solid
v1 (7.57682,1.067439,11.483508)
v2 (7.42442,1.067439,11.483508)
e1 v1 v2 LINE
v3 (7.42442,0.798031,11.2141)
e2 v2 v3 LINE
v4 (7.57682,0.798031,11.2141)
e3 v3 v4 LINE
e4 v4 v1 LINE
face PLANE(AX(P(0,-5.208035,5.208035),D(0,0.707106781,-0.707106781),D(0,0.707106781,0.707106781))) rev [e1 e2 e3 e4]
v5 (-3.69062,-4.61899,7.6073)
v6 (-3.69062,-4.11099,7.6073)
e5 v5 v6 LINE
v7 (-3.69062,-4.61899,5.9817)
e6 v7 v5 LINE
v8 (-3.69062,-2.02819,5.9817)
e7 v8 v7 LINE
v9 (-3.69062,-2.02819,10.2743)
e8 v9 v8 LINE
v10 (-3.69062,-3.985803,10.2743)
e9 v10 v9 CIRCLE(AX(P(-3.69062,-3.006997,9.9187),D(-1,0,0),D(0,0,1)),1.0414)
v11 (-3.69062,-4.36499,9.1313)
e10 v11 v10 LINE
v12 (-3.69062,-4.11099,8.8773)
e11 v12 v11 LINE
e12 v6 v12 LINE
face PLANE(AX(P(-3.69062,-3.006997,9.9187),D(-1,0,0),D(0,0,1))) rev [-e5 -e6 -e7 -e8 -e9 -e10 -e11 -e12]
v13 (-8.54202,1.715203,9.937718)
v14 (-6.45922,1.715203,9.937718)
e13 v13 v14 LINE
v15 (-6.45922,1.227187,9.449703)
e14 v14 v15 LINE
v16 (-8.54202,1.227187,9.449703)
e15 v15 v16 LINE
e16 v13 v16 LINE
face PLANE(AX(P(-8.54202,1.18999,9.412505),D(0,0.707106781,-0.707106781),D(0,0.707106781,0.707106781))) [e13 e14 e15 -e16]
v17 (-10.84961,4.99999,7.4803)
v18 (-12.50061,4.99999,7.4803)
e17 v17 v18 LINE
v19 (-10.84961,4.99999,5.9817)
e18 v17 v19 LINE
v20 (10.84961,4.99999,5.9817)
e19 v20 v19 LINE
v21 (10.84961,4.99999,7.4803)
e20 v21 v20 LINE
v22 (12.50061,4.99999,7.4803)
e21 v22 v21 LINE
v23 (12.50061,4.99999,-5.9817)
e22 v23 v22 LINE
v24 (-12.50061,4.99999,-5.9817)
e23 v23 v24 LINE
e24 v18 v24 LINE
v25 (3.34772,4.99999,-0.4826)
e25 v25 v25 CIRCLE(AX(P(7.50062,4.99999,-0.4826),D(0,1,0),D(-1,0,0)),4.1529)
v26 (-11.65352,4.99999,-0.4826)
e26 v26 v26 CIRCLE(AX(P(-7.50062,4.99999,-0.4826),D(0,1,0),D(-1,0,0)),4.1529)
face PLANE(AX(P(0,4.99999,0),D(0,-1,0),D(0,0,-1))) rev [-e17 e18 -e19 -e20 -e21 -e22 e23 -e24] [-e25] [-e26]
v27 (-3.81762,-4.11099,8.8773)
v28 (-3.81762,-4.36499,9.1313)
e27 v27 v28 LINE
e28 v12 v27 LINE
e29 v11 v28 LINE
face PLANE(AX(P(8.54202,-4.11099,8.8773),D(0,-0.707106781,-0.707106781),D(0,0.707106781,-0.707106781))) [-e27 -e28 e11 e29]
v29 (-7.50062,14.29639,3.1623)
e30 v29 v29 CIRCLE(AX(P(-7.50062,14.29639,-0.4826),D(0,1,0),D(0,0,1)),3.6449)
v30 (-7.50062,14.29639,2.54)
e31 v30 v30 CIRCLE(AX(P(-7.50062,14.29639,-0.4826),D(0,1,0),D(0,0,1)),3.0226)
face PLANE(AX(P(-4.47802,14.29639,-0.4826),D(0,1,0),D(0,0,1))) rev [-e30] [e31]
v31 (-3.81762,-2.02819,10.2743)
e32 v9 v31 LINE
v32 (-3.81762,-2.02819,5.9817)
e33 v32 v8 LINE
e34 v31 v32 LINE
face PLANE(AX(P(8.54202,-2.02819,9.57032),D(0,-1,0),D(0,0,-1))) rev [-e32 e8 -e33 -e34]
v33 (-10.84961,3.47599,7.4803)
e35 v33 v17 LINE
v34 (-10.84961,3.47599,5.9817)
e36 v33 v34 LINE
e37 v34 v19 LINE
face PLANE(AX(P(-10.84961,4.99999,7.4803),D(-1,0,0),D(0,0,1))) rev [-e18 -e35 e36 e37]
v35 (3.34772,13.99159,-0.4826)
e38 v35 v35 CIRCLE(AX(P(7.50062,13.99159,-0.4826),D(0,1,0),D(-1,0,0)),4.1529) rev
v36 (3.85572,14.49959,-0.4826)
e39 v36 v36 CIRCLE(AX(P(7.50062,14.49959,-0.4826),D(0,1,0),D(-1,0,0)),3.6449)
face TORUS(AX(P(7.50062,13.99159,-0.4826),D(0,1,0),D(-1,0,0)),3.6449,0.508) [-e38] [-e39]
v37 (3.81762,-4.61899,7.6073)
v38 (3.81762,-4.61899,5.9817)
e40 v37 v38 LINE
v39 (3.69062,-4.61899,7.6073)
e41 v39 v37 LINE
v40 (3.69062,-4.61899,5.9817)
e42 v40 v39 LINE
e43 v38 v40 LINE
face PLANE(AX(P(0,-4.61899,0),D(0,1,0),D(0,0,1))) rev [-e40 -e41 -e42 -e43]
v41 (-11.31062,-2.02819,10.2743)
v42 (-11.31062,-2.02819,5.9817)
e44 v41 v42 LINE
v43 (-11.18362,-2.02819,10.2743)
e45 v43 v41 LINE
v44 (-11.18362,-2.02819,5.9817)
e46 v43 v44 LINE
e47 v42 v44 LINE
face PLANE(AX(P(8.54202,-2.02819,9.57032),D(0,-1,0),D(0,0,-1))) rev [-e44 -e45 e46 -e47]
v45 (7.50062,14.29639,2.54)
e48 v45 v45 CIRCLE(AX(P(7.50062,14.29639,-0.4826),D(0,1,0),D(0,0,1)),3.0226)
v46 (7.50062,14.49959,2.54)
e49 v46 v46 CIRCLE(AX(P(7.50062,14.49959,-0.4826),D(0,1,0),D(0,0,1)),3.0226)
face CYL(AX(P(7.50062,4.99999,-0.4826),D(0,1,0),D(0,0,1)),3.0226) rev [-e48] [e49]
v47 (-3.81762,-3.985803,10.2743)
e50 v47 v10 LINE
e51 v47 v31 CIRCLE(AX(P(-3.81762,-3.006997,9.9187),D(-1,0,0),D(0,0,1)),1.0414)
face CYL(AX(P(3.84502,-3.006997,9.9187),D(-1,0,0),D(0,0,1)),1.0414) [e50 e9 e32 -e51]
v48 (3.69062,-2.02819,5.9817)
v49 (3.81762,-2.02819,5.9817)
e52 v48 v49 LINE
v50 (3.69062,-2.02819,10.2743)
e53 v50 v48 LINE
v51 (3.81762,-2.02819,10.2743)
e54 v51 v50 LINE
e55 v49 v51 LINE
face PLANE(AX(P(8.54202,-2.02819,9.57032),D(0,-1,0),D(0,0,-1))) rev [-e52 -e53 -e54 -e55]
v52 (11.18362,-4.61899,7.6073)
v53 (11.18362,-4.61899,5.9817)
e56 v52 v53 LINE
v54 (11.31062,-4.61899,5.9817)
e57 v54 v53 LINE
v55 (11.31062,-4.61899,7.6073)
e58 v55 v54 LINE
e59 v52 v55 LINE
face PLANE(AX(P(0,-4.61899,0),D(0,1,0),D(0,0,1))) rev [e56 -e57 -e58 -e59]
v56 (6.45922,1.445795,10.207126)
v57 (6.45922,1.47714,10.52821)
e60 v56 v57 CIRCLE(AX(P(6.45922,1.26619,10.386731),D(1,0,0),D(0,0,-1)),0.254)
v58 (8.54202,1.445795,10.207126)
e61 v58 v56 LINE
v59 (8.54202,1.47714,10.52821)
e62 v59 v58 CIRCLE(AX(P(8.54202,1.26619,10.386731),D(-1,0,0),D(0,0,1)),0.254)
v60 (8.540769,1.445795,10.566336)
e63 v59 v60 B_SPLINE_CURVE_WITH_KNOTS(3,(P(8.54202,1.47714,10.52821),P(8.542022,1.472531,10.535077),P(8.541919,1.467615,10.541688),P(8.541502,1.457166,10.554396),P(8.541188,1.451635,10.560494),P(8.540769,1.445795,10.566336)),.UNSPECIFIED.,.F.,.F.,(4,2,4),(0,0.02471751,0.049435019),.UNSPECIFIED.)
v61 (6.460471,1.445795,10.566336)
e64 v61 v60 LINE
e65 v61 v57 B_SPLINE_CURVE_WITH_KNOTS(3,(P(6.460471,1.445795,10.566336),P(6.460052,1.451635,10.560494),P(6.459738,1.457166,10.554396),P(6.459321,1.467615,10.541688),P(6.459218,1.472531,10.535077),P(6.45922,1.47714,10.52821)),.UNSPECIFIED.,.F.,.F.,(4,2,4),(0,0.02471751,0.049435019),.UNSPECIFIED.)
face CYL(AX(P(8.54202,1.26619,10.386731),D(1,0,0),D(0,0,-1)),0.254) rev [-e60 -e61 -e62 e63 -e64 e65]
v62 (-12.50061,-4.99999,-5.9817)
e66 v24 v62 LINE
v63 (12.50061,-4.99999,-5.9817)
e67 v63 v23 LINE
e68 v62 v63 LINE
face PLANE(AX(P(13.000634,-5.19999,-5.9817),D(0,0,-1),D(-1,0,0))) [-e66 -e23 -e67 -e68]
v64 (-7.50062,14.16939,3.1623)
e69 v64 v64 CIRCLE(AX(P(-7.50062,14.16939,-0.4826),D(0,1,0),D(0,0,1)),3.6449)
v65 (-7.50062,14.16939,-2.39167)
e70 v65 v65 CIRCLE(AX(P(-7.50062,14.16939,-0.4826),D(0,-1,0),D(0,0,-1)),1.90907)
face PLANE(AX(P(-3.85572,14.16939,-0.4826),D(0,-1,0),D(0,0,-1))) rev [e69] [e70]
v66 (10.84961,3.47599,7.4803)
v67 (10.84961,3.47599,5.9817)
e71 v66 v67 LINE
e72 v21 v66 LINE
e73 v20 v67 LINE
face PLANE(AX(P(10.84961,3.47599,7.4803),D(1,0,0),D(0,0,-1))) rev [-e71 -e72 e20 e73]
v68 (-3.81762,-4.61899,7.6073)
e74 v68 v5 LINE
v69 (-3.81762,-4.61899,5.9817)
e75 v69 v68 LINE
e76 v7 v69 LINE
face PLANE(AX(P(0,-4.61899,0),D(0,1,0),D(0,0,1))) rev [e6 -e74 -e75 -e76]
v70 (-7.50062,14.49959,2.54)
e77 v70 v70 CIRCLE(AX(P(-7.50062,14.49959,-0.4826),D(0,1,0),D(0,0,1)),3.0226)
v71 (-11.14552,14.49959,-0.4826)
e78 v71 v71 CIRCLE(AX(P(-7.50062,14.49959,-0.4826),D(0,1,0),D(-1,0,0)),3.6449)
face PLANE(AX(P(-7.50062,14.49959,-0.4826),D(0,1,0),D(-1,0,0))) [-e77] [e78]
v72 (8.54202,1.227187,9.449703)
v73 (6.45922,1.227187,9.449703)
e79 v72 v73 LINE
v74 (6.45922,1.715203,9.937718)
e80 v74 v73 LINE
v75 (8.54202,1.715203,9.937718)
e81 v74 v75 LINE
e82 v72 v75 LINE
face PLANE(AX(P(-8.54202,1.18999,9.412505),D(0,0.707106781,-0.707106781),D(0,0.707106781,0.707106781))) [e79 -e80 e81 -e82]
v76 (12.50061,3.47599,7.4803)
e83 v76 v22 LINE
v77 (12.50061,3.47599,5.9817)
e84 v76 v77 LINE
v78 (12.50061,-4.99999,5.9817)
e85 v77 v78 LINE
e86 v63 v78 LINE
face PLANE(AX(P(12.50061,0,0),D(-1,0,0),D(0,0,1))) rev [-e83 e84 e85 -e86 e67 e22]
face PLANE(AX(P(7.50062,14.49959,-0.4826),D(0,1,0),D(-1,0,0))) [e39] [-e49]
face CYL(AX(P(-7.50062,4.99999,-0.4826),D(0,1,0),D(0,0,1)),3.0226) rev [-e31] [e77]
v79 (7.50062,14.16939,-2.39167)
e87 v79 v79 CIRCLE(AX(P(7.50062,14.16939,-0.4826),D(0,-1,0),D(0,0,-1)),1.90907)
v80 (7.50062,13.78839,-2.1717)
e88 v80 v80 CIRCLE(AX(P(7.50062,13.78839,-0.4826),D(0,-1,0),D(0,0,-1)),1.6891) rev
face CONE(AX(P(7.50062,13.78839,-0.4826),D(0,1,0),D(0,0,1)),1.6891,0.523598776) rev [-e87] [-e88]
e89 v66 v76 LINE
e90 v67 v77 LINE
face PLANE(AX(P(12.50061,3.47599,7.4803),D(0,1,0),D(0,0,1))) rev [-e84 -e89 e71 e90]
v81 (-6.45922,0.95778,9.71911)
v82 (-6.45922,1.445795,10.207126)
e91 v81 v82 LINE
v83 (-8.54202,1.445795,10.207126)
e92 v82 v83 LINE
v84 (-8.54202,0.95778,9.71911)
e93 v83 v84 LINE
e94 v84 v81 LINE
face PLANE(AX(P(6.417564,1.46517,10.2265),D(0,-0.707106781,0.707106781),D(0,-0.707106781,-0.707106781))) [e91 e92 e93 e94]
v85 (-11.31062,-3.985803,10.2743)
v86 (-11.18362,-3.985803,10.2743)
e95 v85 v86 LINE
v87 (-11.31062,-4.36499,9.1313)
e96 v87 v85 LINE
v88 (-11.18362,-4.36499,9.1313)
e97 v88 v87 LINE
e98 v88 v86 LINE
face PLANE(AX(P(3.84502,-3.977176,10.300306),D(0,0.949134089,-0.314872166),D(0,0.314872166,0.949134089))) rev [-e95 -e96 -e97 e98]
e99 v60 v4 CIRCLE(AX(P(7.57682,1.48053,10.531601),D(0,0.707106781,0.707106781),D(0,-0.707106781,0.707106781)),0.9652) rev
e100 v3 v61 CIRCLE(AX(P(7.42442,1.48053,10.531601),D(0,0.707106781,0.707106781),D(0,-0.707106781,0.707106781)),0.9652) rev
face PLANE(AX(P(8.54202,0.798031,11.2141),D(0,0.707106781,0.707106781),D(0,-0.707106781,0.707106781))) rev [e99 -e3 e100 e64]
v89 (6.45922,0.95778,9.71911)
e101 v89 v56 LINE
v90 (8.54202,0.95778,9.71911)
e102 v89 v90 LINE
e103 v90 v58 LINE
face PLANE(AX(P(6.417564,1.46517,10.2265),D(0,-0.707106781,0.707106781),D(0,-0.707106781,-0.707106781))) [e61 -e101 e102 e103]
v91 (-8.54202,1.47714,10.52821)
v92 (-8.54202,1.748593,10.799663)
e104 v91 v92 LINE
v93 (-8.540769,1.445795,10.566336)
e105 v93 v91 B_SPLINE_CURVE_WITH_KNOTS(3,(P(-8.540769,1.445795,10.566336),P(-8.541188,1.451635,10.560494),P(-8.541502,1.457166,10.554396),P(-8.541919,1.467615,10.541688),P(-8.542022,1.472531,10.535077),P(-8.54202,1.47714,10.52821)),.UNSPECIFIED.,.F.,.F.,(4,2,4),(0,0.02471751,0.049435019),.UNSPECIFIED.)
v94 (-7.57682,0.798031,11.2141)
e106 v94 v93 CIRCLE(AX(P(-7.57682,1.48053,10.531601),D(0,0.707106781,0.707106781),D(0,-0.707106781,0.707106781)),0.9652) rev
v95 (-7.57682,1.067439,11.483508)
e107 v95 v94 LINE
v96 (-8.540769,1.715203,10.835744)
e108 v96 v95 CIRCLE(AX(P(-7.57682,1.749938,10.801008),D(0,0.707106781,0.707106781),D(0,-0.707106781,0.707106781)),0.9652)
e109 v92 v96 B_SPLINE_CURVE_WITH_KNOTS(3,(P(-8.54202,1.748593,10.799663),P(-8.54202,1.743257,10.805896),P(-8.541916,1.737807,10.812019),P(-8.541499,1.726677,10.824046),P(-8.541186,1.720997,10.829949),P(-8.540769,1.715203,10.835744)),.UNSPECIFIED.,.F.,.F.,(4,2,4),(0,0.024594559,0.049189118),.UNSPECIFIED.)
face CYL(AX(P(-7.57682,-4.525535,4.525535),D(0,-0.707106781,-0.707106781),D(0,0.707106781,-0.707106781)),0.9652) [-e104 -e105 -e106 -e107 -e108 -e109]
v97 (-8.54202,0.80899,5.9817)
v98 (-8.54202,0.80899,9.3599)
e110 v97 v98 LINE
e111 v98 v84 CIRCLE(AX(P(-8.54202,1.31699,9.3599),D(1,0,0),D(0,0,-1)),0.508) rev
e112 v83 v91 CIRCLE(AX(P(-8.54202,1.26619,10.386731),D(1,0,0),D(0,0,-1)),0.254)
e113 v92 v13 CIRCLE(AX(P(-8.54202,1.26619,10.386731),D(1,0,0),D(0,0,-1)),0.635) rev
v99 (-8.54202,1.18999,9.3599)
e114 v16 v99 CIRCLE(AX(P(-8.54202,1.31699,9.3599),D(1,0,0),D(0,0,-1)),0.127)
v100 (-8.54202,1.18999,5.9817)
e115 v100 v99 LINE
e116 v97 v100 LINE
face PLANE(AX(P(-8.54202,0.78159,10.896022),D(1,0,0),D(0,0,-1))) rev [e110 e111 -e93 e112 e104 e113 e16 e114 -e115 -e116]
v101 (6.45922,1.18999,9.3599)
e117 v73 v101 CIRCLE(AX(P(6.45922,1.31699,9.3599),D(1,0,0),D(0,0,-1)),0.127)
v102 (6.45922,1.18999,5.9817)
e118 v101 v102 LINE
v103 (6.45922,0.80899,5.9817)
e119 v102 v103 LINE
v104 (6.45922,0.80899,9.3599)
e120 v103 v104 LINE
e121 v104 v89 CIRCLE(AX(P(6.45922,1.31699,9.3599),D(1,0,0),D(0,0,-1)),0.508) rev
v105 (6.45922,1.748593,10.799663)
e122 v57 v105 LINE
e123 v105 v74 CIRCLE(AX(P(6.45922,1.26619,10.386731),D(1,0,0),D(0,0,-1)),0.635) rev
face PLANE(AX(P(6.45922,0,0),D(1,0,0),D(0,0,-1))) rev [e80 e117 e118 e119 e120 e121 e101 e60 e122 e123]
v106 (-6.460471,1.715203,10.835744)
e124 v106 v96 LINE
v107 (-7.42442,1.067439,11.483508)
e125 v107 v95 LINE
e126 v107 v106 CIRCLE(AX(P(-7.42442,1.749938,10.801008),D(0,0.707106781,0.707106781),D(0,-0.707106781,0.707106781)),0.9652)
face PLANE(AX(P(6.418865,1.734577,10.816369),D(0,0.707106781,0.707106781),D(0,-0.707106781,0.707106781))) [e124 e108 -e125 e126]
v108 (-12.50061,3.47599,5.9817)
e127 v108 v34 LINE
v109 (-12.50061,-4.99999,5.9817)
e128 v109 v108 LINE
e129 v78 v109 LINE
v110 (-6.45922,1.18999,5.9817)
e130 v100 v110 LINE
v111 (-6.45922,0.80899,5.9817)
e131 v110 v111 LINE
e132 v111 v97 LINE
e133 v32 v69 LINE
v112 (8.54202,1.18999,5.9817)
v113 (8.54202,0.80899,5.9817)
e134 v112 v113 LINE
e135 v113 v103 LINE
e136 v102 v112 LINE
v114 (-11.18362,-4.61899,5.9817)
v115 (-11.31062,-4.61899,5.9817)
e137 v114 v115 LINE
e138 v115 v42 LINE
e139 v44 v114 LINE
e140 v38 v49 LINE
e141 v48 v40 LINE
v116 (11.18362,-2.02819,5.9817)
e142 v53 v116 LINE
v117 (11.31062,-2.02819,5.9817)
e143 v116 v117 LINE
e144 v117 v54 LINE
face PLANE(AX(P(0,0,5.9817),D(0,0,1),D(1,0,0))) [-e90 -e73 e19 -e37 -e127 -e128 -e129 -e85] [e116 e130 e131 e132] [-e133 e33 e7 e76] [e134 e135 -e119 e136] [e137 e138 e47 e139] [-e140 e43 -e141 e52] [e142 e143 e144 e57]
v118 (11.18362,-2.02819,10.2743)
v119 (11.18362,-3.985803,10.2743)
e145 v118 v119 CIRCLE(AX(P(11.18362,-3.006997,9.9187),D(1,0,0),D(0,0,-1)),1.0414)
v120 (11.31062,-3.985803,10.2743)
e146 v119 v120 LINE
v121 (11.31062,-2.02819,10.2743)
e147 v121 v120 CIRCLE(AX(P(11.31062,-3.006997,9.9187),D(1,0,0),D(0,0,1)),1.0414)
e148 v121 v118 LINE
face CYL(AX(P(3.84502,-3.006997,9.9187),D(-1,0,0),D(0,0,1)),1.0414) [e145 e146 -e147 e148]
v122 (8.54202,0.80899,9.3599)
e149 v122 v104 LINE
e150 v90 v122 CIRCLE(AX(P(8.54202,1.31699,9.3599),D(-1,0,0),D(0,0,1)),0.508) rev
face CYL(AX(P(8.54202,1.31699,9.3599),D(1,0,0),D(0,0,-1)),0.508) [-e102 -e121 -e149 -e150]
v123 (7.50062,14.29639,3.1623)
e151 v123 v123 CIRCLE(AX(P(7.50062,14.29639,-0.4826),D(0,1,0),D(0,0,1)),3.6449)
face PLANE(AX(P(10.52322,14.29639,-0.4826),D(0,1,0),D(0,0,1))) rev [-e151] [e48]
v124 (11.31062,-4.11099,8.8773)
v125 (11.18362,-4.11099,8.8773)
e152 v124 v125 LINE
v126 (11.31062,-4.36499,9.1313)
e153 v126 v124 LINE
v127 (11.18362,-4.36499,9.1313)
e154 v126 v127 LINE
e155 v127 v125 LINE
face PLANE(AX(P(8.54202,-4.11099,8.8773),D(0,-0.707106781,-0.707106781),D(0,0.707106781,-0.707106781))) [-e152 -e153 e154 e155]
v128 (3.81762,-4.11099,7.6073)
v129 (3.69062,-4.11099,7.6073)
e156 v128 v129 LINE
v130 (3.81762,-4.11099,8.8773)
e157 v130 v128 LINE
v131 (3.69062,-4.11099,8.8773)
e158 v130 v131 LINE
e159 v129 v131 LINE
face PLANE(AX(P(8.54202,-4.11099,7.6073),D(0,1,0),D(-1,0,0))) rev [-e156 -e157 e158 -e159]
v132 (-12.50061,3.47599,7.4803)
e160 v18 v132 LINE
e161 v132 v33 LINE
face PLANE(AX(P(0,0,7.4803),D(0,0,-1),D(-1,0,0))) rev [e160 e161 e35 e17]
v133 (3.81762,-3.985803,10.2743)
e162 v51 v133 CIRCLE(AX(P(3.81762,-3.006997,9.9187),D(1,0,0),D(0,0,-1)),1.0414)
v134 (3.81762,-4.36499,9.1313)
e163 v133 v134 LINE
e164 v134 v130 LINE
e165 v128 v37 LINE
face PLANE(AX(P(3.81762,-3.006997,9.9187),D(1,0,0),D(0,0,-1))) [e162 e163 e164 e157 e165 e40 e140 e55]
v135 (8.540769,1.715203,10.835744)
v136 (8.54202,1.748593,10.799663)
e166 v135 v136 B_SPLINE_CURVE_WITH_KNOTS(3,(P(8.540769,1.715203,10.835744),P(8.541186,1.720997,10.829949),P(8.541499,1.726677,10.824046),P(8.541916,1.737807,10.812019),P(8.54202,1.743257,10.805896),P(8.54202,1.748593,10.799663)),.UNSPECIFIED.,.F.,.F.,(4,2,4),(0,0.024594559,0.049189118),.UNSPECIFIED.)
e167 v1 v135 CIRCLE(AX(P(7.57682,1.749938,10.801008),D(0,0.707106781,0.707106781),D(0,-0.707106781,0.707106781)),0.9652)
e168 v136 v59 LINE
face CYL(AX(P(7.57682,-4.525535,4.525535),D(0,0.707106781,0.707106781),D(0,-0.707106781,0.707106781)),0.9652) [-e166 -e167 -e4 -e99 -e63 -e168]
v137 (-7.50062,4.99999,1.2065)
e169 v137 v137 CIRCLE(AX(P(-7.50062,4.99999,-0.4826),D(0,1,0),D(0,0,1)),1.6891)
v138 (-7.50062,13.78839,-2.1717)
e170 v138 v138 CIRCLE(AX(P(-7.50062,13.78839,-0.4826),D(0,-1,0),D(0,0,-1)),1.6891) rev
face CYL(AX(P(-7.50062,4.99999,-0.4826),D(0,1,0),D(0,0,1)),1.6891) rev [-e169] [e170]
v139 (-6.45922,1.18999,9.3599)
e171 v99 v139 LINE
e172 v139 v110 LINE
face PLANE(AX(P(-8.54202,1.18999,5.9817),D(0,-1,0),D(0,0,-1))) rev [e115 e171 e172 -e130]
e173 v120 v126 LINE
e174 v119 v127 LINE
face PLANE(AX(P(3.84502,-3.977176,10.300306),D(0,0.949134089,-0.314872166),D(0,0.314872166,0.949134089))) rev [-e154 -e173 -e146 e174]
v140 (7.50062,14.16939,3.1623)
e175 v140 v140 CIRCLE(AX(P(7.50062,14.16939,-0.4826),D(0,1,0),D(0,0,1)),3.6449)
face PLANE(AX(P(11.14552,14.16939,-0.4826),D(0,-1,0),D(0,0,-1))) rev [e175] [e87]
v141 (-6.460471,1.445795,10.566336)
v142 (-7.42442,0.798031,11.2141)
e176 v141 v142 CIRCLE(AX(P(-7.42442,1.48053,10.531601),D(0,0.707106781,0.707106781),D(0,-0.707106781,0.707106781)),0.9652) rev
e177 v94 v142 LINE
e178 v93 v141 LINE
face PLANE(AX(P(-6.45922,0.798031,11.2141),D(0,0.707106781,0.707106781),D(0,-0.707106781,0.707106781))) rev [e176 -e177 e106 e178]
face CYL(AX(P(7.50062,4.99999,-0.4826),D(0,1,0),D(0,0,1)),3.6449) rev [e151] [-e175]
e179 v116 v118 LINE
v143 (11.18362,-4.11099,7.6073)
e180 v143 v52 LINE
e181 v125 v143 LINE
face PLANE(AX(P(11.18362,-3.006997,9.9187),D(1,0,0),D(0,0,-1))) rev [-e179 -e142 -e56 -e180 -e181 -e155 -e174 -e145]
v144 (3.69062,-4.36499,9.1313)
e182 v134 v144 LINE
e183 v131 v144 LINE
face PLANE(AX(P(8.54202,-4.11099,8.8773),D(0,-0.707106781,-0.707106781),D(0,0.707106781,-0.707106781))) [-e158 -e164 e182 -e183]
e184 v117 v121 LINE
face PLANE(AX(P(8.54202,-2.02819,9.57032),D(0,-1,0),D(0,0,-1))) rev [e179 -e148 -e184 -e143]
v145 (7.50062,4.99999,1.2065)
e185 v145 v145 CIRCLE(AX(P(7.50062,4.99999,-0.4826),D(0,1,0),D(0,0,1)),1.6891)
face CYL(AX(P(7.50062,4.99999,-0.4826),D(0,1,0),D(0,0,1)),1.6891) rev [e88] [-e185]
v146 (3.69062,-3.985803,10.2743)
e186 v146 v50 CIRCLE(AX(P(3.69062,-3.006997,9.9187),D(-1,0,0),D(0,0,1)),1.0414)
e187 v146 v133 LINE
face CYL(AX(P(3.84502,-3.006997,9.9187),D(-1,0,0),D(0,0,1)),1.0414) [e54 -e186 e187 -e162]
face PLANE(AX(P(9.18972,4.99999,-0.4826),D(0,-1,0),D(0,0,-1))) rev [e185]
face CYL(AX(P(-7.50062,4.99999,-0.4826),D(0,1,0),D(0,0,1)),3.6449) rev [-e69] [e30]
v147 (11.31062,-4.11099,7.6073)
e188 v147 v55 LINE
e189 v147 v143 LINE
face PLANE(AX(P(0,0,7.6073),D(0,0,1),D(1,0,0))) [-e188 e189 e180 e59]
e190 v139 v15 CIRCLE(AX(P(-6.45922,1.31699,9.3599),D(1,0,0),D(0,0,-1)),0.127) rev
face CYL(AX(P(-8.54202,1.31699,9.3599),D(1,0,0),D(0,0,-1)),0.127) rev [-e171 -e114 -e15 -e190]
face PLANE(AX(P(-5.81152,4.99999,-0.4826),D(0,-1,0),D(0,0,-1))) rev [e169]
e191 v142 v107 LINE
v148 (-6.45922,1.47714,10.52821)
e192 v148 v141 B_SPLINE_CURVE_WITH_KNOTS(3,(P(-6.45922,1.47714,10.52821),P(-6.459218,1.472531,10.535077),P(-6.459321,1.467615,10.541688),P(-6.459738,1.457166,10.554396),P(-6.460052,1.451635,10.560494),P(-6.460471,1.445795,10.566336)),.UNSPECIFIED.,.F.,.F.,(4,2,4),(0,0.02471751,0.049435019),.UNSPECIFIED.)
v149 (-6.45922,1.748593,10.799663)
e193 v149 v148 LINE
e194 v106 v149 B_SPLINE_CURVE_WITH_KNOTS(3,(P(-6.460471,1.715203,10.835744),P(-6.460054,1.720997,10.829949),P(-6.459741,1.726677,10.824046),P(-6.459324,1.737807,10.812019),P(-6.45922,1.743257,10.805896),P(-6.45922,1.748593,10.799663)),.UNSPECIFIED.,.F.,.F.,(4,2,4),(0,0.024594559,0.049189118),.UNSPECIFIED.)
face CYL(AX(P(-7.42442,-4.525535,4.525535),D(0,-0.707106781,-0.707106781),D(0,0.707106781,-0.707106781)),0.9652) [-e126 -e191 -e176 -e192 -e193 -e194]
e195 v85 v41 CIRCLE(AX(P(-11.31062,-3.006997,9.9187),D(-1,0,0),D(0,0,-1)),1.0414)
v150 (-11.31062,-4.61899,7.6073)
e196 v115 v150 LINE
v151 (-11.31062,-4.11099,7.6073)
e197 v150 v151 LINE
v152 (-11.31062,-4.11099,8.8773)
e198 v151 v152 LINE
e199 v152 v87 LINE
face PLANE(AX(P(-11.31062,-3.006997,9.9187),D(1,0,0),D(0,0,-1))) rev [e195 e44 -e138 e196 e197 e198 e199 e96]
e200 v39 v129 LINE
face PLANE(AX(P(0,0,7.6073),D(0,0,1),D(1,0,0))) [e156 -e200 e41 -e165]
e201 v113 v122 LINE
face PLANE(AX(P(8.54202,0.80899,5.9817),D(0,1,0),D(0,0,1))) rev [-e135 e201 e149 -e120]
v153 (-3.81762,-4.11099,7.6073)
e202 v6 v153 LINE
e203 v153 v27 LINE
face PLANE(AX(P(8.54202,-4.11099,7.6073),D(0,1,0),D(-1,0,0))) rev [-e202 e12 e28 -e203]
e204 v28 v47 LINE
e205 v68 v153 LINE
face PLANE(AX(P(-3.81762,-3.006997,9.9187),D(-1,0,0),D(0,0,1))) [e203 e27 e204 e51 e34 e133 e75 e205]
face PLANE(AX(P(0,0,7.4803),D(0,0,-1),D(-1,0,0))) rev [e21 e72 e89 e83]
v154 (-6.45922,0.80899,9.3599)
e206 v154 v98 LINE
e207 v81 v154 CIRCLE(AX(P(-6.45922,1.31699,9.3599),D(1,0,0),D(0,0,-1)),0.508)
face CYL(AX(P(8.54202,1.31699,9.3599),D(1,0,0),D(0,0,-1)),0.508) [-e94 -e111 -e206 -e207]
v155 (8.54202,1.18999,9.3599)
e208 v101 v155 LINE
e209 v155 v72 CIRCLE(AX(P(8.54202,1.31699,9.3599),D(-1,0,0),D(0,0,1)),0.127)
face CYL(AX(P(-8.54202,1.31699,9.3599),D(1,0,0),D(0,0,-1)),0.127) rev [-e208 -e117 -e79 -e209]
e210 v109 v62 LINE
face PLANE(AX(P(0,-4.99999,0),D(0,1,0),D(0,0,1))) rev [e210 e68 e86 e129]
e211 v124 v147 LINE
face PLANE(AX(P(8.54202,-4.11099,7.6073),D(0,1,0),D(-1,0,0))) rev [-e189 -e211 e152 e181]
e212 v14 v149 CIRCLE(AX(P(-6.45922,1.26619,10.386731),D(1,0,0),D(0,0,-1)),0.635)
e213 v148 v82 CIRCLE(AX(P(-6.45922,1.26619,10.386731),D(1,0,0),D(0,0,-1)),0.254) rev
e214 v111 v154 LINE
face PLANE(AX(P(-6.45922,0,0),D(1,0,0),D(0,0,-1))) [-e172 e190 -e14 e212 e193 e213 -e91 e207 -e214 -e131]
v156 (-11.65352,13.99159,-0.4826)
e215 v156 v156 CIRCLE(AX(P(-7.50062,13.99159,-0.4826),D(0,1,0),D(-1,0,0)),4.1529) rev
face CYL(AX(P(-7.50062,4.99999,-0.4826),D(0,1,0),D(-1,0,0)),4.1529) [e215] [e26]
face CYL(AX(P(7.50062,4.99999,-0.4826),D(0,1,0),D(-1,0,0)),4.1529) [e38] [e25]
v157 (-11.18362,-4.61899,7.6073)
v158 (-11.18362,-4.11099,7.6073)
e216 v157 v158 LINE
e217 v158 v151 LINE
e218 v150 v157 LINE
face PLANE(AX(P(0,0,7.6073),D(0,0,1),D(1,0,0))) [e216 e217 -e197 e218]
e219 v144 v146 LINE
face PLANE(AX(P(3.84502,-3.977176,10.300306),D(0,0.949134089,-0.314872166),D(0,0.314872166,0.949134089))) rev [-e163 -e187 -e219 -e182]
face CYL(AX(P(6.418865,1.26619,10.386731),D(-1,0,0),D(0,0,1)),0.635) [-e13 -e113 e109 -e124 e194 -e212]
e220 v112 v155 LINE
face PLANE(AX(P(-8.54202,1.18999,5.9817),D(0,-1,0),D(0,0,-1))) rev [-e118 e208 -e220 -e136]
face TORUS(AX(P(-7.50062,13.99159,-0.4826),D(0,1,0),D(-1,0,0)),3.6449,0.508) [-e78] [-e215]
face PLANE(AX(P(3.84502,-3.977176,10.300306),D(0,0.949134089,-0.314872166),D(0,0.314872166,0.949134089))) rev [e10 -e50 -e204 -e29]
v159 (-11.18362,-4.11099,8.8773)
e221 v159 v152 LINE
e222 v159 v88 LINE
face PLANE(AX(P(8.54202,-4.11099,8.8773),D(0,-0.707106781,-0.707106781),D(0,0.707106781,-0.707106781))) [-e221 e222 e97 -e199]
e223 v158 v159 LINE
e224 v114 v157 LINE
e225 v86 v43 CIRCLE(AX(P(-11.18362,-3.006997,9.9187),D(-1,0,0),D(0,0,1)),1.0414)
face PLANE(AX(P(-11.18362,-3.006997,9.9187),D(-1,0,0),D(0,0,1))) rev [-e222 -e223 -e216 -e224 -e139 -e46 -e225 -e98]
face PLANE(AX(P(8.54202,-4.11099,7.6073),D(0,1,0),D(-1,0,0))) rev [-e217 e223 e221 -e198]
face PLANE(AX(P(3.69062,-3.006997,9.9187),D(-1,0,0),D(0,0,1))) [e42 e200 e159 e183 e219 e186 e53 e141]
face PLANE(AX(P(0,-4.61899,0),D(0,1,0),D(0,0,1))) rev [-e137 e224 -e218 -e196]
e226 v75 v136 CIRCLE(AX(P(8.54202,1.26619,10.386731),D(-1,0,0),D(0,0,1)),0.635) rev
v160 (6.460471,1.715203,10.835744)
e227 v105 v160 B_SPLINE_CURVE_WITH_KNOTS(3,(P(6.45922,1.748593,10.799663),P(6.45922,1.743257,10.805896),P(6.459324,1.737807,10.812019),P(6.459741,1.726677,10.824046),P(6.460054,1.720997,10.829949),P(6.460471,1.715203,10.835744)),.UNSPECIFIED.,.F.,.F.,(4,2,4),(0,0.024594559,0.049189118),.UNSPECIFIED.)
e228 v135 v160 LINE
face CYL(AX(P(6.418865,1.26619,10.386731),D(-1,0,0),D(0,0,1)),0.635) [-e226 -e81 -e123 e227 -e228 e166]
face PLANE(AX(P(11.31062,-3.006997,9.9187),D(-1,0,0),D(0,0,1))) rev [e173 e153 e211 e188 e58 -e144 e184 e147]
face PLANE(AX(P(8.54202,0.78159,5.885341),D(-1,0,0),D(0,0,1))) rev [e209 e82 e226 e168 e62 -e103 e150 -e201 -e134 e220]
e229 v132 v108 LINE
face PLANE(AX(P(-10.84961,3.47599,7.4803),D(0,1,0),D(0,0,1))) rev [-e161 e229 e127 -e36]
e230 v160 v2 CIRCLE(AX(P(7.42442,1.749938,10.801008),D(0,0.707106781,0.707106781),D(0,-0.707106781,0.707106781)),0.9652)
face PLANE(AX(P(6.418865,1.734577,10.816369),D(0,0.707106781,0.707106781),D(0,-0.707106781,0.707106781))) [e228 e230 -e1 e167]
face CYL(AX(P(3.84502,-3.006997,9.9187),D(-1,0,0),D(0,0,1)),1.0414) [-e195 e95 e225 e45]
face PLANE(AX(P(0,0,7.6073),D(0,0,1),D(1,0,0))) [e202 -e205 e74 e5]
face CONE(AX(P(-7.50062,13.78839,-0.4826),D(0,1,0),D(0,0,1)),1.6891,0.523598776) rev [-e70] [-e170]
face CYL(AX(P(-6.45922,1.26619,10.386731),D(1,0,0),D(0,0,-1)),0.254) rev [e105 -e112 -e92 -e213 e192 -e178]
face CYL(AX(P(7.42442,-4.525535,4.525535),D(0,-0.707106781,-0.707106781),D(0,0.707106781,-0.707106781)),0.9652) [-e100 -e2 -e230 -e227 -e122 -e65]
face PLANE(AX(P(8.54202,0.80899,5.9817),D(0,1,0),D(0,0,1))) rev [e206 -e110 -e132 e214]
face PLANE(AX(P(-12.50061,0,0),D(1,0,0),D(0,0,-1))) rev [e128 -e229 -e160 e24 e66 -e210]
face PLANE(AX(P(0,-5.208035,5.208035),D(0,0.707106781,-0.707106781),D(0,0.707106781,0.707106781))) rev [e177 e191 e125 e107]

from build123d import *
from OCP.BRepFilletAPI import BRepFilletAPI_MakeChamfer

# Parameters (mm, degrees)
BOSS_EXTRUDE1_START  = -8.54202
BOSS_EXTRUDE1_DEPTH  = 17.08404
SKETCH2_W            = 17.08404
SKETCH2_H            = 15.394205122
BOSS_EXTRUDE2_DEPTH  = 1.861548776
CUT_EXTRUDE1_DEPTH   = 21.904260683
SKETCH4_W            = 17.08404
SKETCH4_H            = 3.81
CUT_EXTRUDE2_DEPTH   = 3.430805122
SKETCH5_W            = 17.08404
SKETCH5_H            = 2.83718
CUT_EXTRUDE3_DEPTH   = 3.58862049
SKETCH6_W            = 17.08404
SKETCH6_H            = 0.508
CUT_EXTRUDE4_DEPTH   = 1.27
CUT_EXTRUDE5_DEPTH   = 12.91844
BOSS_EXTRUDE3_DEPTH  = 2.7686
BOSS_EXTRUDE4_START  = 2.7686
BOSS_EXTRUDE4_DEPTH  = 2.7686
CUT_EXTRUDE6_DEPTH   = 7.366
CUT_EXTRUDE7_START   = -7.366
CUT_EXTRUDE7_DEPTH   = 7.366
CUT_EXTRUDE8_DEPTH   = 7.38124
SKETCH13_W           = 11.9634
SKETCH13_H           = 9.61898
BOSS_EXTRUDE5_DEPTH  = 1.18999
SKETCH14_W           = 11.9634
SKETCH14_H           = 9.61898
BOSS_EXTRUDE6_DEPTH  = 1.18999
SKETCH15_W           = 25.00122
SKETCH15_H           = 11.9634
BOSS_EXTRUDE7_DEPTH  = 0.381
SKETCH16_W           = 2.0828
SKETCH16_H           = 0.381
BOSS_EXTRUDE8_DEPTH  = 1.170076836
SKETCH17_W           = 2.0828
SKETCH17_H           = 0.381
BOSS_EXTRUDE9_DEPTH  = 1.170076836
SKETCH18_W           = 1.651
SKETCH18_H           = 1.524
BOSS_EXTRUDE10_DEPTH = 1.4986
SKETCH19_W           = 1.651
SKETCH19_H           = 1.524
BOSS_EXTRUDE11_DEPTH = 1.4986
DRAFT1_ANGLE         = 45
DRAFT2_ANGLE         = 45
DRAFT3_START         = 2
DRAFT3_OUTLINE_W     = 0.127
DRAFT3_OUTLINE_H     = 0.359210245
DRAFT3_DEPTH         = 1.370290122
DRAFT4_ANGLE         = 45
DRAFT5_ANGLE         = 45
DRAFT6_START         = 2
DRAFT6_OUTLINE_W     = 0.127
DRAFT6_OUTLINE_H     = 0.359210245
DRAFT6_DEPTH         = 1.370290122
SKETCH20_W           = 4.1529
SKETCH20_H           = 9.4996
SKETCH21_W           = 4.1529
SKETCH21_H           = 9.4996
CHAMFER1_SIZE        = 0.219970453
CHAMFER1_SIZE2       = 0.381
FILLET1_R            = 0.127
FILLET2_R            = 0.254
FILLET3_R            = 0.508
FILLET4_R            = 0.635
FILLET5_R            = 0.9652


with BuildPart() as part:
    # Boss-Extrude1: read off the stored shape, not the designer's step
    # Boss-Extrude1 outline → Boss-Extrude1 (new body)
    with BuildSketch(Plane.YZ.offset(BOSS_EXTRUDE1_START)):
        with BuildLine():
            Line((-4.61899, 8.8773), (-4.61899, -5.9817))
            Line((-4.61899, -5.9817), (3.138441224, -5.9817))
            Line((3.138441224, -5.9817), (3.138441224, 9.412505122))
            Line((3.138441224, 9.412505122), (1.894807928, 10.656138418))
            Line((1.894807928, 10.656138418), (0.80899, 9.57032049))
            Line((0.80899, 9.57032049), (-2.025596867, 9.57032049))
            ThreePointArc((-2.025596867, 9.57032049), (-2.65500458, 10.898809938), (-3.985803445, 10.2743))
            Line((-3.985803445, 10.2743), (-4.449253679, 8.8773))
            Line((-4.449253679, 8.8773), (-4.61899, 8.8773))
        make_face()
    extrude(amount=BOSS_EXTRUDE1_DEPTH)

    # Sketch2 → Boss-Extrude2 (add)
    with BuildSketch(Plane(origin=(0, 3.138441224, 0), x_dir=(-1, 0, 0), z_dir=(0, 1, 0))):
        with Locations((0, 1.715402561)):
            Rectangle(SKETCH2_W, SKETCH2_H)
    extrude(amount=BOSS_EXTRUDE2_DEPTH)

    # Sketch3 → Cut-Extrude1 (cut, through all)
    with BuildSketch(Plane.ZY.offset(8.54202)):
        with BuildLine():
            Line((9.57032049, -2.025596867), (9.57032049, -2.02819))
            Line((9.57032049, -2.02819), (10.2743, -2.02819))
            ThreePointArc((10.2743, -2.02819), (9.922536007, -1.965603788), (9.57032049, -2.025596867))
        make_face()
    extrude(amount=-CUT_EXTRUDE1_DEPTH, mode=Mode.SUBTRACT)

    # Sketch4 → Cut-Extrude2 (cut)
    with BuildSketch(Plane.XY.offset(9.412505122)):
        with Locations((0, 3.09499)):
            Rectangle(SKETCH4_W, SKETCH4_H)
    extrude(amount=-CUT_EXTRUDE2_DEPTH, mode=Mode.SUBTRACT)

    # Sketch5 → Cut-Extrude3 (cut)
    with BuildSketch(Plane.XY.offset(9.57032049)):
        with Locations((0, -0.6096)):
            Rectangle(SKETCH5_W, SKETCH5_H)
    extrude(amount=-CUT_EXTRUDE3_DEPTH, mode=Mode.SUBTRACT)

    # Sketch6 → Cut-Extrude4 (cut)
    with BuildSketch(Plane.XY.offset(8.8773)):
        with Locations((0, -4.36499)):
            Rectangle(SKETCH6_W, SKETCH6_H)
    extrude(amount=-CUT_EXTRUDE4_DEPTH, mode=Mode.SUBTRACT)

    # Sketch7 → Cut-Extrude5 (cut)
    with BuildSketch(Plane(origin=(-6.45922, 0, 0), x_dir=(0, -1, 0), z_dir=(-1, 0, 0))):
        Polygon((-0.80899, 9.57032049), (-1.894807928, 10.656138418), (-3.138441224, 9.412505122), (-1.18999, 9.412505122), (-1.18999, 5.9817), (-0.80899, 5.9817), align=None)
    extrude(amount=-CUT_EXTRUDE5_DEPTH, mode=Mode.SUBTRACT)

    # Sketch8 → Boss-Extrude3 (add)
    with BuildSketch(Plane(origin=(8.54202, 0, 0), x_dir=(0, 0, -1), z_dir=(1, 0, 0))):
        with BuildLine():
            Line((-7.6073, -4.11099), (-8.8773, -4.11099))
            Line((-8.8773, -4.11099), (-8.8773, -4.449253679))
            Line((-8.8773, -4.449253679), (-10.2743, -3.985803445))
            ThreePointArc((-10.2743, -3.985803445), (-10.9601, -3.006996722), (-10.2743, -2.02819))
            Line((-10.2743, -2.02819), (-5.9817, -2.02819))
            Line((-5.9817, -2.02819), (-5.9817, 4.99999))
            Line((-5.9817, 4.99999), (5.9817, 4.99999))
            Line((5.9817, 4.99999), (5.9817, -4.61899))
            Line((5.9817, -4.61899), (-7.6073, -4.61899))
            Line((-7.6073, -4.61899), (-7.6073, -4.11099))
        make_face()
    extrude(amount=BOSS_EXTRUDE3_DEPTH)

    # Sketch9 → Boss-Extrude4 (add)
    with BuildSketch(Plane.ZY.offset(8.54202).offset(BOSS_EXTRUDE4_START)):
        with BuildLine():
            Line((10.2743, -3.985803445), (8.8773, -4.449253679))
            Line((8.8773, -4.449253679), (8.8773, -4.11099))
            Line((8.8773, -4.11099), (7.6073, -4.11099))
            Line((7.6073, -4.11099), (7.6073, -4.61899))
            Line((7.6073, -4.61899), (-5.9817, -4.61899))
            Line((-5.9817, -4.61899), (-5.9817, 4.99999))
            Line((-5.9817, 4.99999), (5.9817, 4.99999))
            Line((5.9817, 4.99999), (5.9817, -2.02819))
            Line((5.9817, -2.02819), (10.2743, -2.02819))
            ThreePointArc((10.2743, -2.02819), (10.9601, -3.006996723), (10.2743, -3.985803445))
        make_face()
    extrude(amount=-BOSS_EXTRUDE4_DEPTH)

    # Sketch10 → Cut-Extrude6 (cut)
    with BuildSketch(Plane(origin=(-11.18362, 0, 0), x_dir=(0, -1, 0), z_dir=(-1, 0, 0))):
        with BuildLine():
            Line((4.449253679, 8.8773), (3.985803445, 10.2743))
            ThreePointArc((3.985803445, 10.2743), (3.006996722, 10.9601), (2.02819, 10.2743))
            Line((2.02819, 10.2743), (2.02819, 5.9817))
            Line((2.02819, 5.9817), (4.61899, 5.9817))
            Line((4.61899, 5.9817), (4.61899, 7.6073))
            Line((4.61899, 7.6073), (4.11099, 7.6073))
            Line((4.11099, 7.6073), (4.11099, 8.8773))
            Line((4.11099, 8.8773), (4.449253679, 8.8773))
        make_face()
    extrude(amount=-CUT_EXTRUDE6_DEPTH, mode=Mode.SUBTRACT)

    # Sketch11 → Cut-Extrude7 (cut)
    with BuildSketch(Plane(origin=(11.18362, 0, 0), x_dir=(0, 0, -1), z_dir=(1, 0, 0)).offset(CUT_EXTRUDE7_START)):
        with BuildLine():
            Line((-8.8773, -4.11099), (-7.6073, -4.11099))
            Line((-7.6073, -4.11099), (-7.6073, -4.61899))
            Line((-7.6073, -4.61899), (-5.9817, -4.61899))
            Line((-5.9817, -4.61899), (-5.9817, -2.02819))
            Line((-5.9817, -2.02819), (-10.2743, -2.02819))
            ThreePointArc((-10.2743, -2.02819), (-10.9601, -3.006996723), (-10.2743, -3.985803445))
            Line((-10.2743, -3.985803445), (-8.8773, -4.449253679))
            Line((-8.8773, -4.449253679), (-8.8773, -4.11099))
        make_face()
    extrude(amount=CUT_EXTRUDE7_DEPTH, mode=Mode.SUBTRACT)

    # Sketch12 → Cut-Extrude8 (cut)
    with BuildSketch(Plane(origin=(-3.69062, 0, 0), x_dir=(0, -1, 0), z_dir=(-1, 0, 0))):
        with BuildLine():
            Line((4.449253679, 8.8773), (3.985803445, 10.2743))
            ThreePointArc((3.985803445, 10.2743), (3.006996723, 10.9601), (2.02819, 10.2743))
            Line((2.02819, 10.2743), (2.02819, 5.9817))
            Line((2.02819, 5.9817), (4.61899, 5.9817))
            Line((4.61899, 5.9817), (4.61899, 7.6073))
            Line((4.61899, 7.6073), (4.11099, 7.6073))
            Line((4.11099, 7.6073), (4.11099, 8.8773))
            Line((4.11099, 8.8773), (4.449253679, 8.8773))
        make_face()
    extrude(amount=-CUT_EXTRUDE8_DEPTH, mode=Mode.SUBTRACT)

    # Sketch13 → Boss-Extrude5 (add)
    with BuildSketch(Plane(origin=(11.31062, 0, 0), x_dir=(0, 0, -1), z_dir=(1, 0, 0))):
        with Locations((0, 0.1905)):
            Rectangle(SKETCH13_W, SKETCH13_H)
    extrude(amount=BOSS_EXTRUDE5_DEPTH)

    # Sketch14 → Boss-Extrude6 (add)
    with BuildSketch(Plane.ZY.offset(11.31062)):
        with Locations((0, 0.1905)):
            Rectangle(SKETCH14_W, SKETCH14_H)
    extrude(amount=BOSS_EXTRUDE6_DEPTH)

    # Sketch15 → Boss-Extrude7 (add)
    with BuildSketch(Plane.XZ.offset(4.61899)):
        Rectangle(SKETCH15_W, SKETCH15_H)
    extrude(amount=BOSS_EXTRUDE7_DEPTH)

    # Sketch16 → Boss-Extrude8 (add)
    with BuildSketch(Plane(origin=(0, -4.380665245, 4.380665245), x_dir=(1, 0, 0), z_dir=(0, -0.7071067811870595, 0.7071067811860355))):
        with Locations((-7.50062, 8.684359272)):
            Rectangle(SKETCH16_W, SKETCH16_H)
    extrude(amount=BOSS_EXTRUDE8_DEPTH)

    # Sketch17 → Boss-Extrude9 (add)
    with BuildSketch(Plane(origin=(0, -4.380665245, 4.380665245), x_dir=(1, 0, 0), z_dir=(0, -0.7071067811870595, 0.7071067811860355))):
        with Locations((7.50062, 8.684359272)):
            Rectangle(SKETCH17_W, SKETCH17_H)
    extrude(amount=BOSS_EXTRUDE9_DEPTH)

    # Sketch18 → Boss-Extrude10 (add)
    with BuildSketch(Plane.XY.offset(5.9817)):
        with Locations((11.67511, 4.23799)):
            Rectangle(SKETCH18_W, SKETCH18_H)
    extrude(amount=BOSS_EXTRUDE10_DEPTH)

    # Sketch19 → Boss-Extrude11 (add)
    with BuildSketch(Plane.XY.offset(5.9817)):
        with Locations((-11.67511, 4.23799)):
            Rectangle(SKETCH19_W, SKETCH19_H)
    extrude(amount=BOSS_EXTRUDE11_DEPTH)

    # Draft1
    draft1_faces = [part.faces().sort_by_distance(p)[0] for p in [
        (7.50062, 2.164215612, 9.412505122),
    ]]
    draft(draft1_faces, Plane(origin=(-8.54202, 1.18999, 5.9817), x_dir=(0, 0, 1), z_dir=(0, 1, 0)), DRAFT1_ANGLE)

    # Draft2
    draft2_faces = [part.faces().sort_by_distance(p)[0] for p in [
        (-7.50062, 2.164215612, 9.412505122),
    ]]
    draft(draft2_faces, Plane(origin=(-8.54202, 1.18999, 5.9817), x_dir=(0, 0, 1), z_dir=(0, 1, 0)), DRAFT2_ANGLE)

    # Draft3: read off the stored shape, not the designer's step
    # Draft3 outline → Draft3 (cut)
    with BuildSketch(Plane(origin=(0, 0, 0), x_dir=(1, 0, 0), z_dir=(0, 0.707106781186548, 0.707106781186547)).offset(DRAFT3_START)):
        with Locations((3.75412, -9.363713058)):
            Rectangle(DRAFT3_OUTLINE_W, DRAFT3_OUTLINE_H)
    extrude(amount=DRAFT3_DEPTH, mode=Mode.SUBTRACT)

    # Draft4
    draft4_faces = [part.faces().sort_by_distance(p)[0] for p in [
        (-3.75412, -4.280121839, 8.8773),
    ]]
    draft(draft4_faces, Plane(origin=(8.54202, -4.11099, 7.6073), x_dir=(-1, 0, 0), z_dir=(0, -1, 0)), DRAFT4_ANGLE)

    # Draft5
    draft5_faces = [part.faces().sort_by_distance(p)[0] for p in [
        (-11.24712, -4.280121839, 8.8773),
    ]]
    draft(draft5_faces, Plane(origin=(8.54202, -4.11099, 7.6073), x_dir=(-1, 0, 0), z_dir=(0, -1, 0)), DRAFT5_ANGLE)

    # Draft6: read off the stored shape, not the designer's step
    # Draft6 outline → Draft6 (cut)
    with BuildSketch(Plane(origin=(0, 0, 0), x_dir=(1, 0, 0), z_dir=(0, 0.707106781186548, 0.707106781186547)).offset(DRAFT6_START)):
        with Locations((11.24712, -9.363713058)):
            Rectangle(DRAFT6_OUTLINE_W, DRAFT6_OUTLINE_H)
    extrude(amount=DRAFT6_DEPTH, mode=Mode.SUBTRACT)

    # Sketch20 → Revolve1 (revolve)
    with BuildSketch(Plane(origin=(0, 0, -0.4826), x_dir=(-1, 0, 0), z_dir=(0, 0, -1)), mode=Mode.PRIVATE) as revolve1_sk:
        with Locations((5.42417, 9.74979)):
            Rectangle(SKETCH20_W, SKETCH20_H)
    revolve(revolve1_sk.sketch.rotate(Axis((-7.50062, 4.99999, -0.4826), (0, 1, 0)), 180), axis=Axis((-7.50062, 4.99999, -0.4826), (0, 1, 0)))

    # Sketch21 → Revolve2 (revolve)
    with BuildSketch(Plane(origin=(0, 0, -0.4826), x_dir=(-1, 0, 0), z_dir=(0, 0, -1)), mode=Mode.PRIVATE) as revolve2_sk:
        with Locations((-9.57707, 9.74979)):
            Rectangle(SKETCH21_W, SKETCH21_H)
    revolve(revolve2_sk.sketch.rotate(Axis((7.50062, 4.99999, -0.4826), (0, 1, 0)), 180), axis=Axis((7.50062, 4.99999, -0.4826), (0, 1, 0)))

    # Sketch22 → Cut-Revolve1 (revolve, cut)
    with BuildSketch(Plane(origin=(0, 0, -0.4826), x_dir=(-1, 0, 0), z_dir=(0, 0, -1)), mode=Mode.PRIVATE) as cut_revolve1_sk:
        Polygon((5.81152, 4.99999), (7.50062, 4.99999), (7.50062, 14.49959), (4.47802, 14.49959), (4.47802, 14.29639), (3.85572, 14.29639), (3.85572, 14.16939), (5.81152, 14.16939), align=None)
    revolve(cut_revolve1_sk.sketch.rotate(Axis((-7.50062, 4.99999, -0.4826), (0, 1, 0)), 270), axis=Axis((-7.50062, 4.99999, -0.4826), (0, 1, 0)), mode=Mode.SUBTRACT)

    # Sketch23 → Cut-Revolve2 (revolve, cut)
    with BuildSketch(Plane(origin=(0, 0, -0.4826), x_dir=(-1, 0, 0), z_dir=(0, 0, -1)), mode=Mode.PRIVATE) as cut_revolve2_sk:
        Polygon((-9.18972, 4.99999), (-7.50062, 4.99999), (-7.50062, 14.49959), (-10.52322, 14.49959), (-10.52322, 14.29639), (-11.14552, 14.29639), (-11.14552, 14.16939), (-9.18972, 14.16939), align=None)
    revolve(cut_revolve2_sk.sketch.rotate(Axis((7.50062, 4.99999, -0.4826), (0, 1, 0)), 270), axis=Axis((7.50062, 4.99999, -0.4826), (0, 1, 0)), mode=Mode.SUBTRACT)

    # Chamfer1: one chamfer whose edges measure the first distance from different faces: ONE call of the kernel's chamfer builder (chamfer() names one face for all edges)
    chamfer1_edges_1 = [part.edges().sort_by_distance(p)[0] for p in [
        (-7.50062, 14.16939, -2.1717),
    ]]
    chamfer1_side_1 = [part.faces().sort_by_distance(p)[0] for p in [
        (-7.50062, 14.16939, -4.02440666),
    ]]
    chamfer1_edges_2 = [part.edges().sort_by_distance(p)[0] for p in [
        (7.50062, 14.16939, -2.1717),
    ]]
    chamfer1_side_2 = [part.faces().sort_by_distance(p)[0] for p in [
        (7.50062, 14.16939, -4.02440666),
    ]]
    chamfer1 = BRepFilletAPI_MakeChamfer(part.part.solid().wrapped)
    for e in chamfer1_edges_1:
        chamfer1.Add(CHAMFER1_SIZE, CHAMFER1_SIZE2, e.wrapped, chamfer1_side_1[0].wrapped)  # the first distance lies on this face
    for e in chamfer1_edges_2:
        chamfer1.Add(CHAMFER1_SIZE, CHAMFER1_SIZE2, e.wrapped, chamfer1_side_2[0].wrapped)  # the first distance lies on this face
    add(Compound.cast(chamfer1.Shape()), mode=Mode.REPLACE)

    # Fillet1
    fillet1_edges = [part.edges().sort_by_distance(p)[0] for p in [
        (-7.50062, 1.18999, 9.412505122),
        (7.50062, 1.18999, 9.412505122),
    ]]
    fillet(fillet1_edges, radius=FILLET1_R)

    # Fillet2
    fillet2_edges = [part.edges().sort_by_distance(p)[0] for p in [
        (-7.50062, 1.625400245, 10.386730735),
        (7.50062, 1.625400245, 10.386730735),
    ]]
    fillet(fillet2_edges, radius=FILLET2_R)

    # Fillet3
    fillet3_edges = [part.edges().sort_by_distance(p)[0] for p in [
        (-7.50062, 0.80899, 9.57032049),
        (-3.34772, 14.49959, -0.4826),
        (11.65352, 14.49959, -0.4826),
        (7.50062, 0.80899, 9.57032049),
    ]]
    fillet(fillet3_edges, radius=FILLET3_R)

    # Fillet4
    fillet4_edges = [part.edges().sort_by_distance(p)[0] for p in [
        (-7.50062, 2.164215612, 10.386730734),
        (7.50062, 2.164215612, 10.386730734),
    ]]
    fillet(fillet4_edges, radius=FILLET4_R)

    # Fillet5
    fillet5_edges = [part.edges().sort_by_distance(p)[0] for p in [
        (6.45922, 0.932734821, 11.348803842),
        (8.54202, 0.932734821, 11.348803842),
        (-6.45922, 0.932734821, 11.348803842),
        (-8.54202, 0.932734821, 11.348803842),
    ]]
    fillet(fillet5_edges, radius=FILLET5_R)


solid = part.part
